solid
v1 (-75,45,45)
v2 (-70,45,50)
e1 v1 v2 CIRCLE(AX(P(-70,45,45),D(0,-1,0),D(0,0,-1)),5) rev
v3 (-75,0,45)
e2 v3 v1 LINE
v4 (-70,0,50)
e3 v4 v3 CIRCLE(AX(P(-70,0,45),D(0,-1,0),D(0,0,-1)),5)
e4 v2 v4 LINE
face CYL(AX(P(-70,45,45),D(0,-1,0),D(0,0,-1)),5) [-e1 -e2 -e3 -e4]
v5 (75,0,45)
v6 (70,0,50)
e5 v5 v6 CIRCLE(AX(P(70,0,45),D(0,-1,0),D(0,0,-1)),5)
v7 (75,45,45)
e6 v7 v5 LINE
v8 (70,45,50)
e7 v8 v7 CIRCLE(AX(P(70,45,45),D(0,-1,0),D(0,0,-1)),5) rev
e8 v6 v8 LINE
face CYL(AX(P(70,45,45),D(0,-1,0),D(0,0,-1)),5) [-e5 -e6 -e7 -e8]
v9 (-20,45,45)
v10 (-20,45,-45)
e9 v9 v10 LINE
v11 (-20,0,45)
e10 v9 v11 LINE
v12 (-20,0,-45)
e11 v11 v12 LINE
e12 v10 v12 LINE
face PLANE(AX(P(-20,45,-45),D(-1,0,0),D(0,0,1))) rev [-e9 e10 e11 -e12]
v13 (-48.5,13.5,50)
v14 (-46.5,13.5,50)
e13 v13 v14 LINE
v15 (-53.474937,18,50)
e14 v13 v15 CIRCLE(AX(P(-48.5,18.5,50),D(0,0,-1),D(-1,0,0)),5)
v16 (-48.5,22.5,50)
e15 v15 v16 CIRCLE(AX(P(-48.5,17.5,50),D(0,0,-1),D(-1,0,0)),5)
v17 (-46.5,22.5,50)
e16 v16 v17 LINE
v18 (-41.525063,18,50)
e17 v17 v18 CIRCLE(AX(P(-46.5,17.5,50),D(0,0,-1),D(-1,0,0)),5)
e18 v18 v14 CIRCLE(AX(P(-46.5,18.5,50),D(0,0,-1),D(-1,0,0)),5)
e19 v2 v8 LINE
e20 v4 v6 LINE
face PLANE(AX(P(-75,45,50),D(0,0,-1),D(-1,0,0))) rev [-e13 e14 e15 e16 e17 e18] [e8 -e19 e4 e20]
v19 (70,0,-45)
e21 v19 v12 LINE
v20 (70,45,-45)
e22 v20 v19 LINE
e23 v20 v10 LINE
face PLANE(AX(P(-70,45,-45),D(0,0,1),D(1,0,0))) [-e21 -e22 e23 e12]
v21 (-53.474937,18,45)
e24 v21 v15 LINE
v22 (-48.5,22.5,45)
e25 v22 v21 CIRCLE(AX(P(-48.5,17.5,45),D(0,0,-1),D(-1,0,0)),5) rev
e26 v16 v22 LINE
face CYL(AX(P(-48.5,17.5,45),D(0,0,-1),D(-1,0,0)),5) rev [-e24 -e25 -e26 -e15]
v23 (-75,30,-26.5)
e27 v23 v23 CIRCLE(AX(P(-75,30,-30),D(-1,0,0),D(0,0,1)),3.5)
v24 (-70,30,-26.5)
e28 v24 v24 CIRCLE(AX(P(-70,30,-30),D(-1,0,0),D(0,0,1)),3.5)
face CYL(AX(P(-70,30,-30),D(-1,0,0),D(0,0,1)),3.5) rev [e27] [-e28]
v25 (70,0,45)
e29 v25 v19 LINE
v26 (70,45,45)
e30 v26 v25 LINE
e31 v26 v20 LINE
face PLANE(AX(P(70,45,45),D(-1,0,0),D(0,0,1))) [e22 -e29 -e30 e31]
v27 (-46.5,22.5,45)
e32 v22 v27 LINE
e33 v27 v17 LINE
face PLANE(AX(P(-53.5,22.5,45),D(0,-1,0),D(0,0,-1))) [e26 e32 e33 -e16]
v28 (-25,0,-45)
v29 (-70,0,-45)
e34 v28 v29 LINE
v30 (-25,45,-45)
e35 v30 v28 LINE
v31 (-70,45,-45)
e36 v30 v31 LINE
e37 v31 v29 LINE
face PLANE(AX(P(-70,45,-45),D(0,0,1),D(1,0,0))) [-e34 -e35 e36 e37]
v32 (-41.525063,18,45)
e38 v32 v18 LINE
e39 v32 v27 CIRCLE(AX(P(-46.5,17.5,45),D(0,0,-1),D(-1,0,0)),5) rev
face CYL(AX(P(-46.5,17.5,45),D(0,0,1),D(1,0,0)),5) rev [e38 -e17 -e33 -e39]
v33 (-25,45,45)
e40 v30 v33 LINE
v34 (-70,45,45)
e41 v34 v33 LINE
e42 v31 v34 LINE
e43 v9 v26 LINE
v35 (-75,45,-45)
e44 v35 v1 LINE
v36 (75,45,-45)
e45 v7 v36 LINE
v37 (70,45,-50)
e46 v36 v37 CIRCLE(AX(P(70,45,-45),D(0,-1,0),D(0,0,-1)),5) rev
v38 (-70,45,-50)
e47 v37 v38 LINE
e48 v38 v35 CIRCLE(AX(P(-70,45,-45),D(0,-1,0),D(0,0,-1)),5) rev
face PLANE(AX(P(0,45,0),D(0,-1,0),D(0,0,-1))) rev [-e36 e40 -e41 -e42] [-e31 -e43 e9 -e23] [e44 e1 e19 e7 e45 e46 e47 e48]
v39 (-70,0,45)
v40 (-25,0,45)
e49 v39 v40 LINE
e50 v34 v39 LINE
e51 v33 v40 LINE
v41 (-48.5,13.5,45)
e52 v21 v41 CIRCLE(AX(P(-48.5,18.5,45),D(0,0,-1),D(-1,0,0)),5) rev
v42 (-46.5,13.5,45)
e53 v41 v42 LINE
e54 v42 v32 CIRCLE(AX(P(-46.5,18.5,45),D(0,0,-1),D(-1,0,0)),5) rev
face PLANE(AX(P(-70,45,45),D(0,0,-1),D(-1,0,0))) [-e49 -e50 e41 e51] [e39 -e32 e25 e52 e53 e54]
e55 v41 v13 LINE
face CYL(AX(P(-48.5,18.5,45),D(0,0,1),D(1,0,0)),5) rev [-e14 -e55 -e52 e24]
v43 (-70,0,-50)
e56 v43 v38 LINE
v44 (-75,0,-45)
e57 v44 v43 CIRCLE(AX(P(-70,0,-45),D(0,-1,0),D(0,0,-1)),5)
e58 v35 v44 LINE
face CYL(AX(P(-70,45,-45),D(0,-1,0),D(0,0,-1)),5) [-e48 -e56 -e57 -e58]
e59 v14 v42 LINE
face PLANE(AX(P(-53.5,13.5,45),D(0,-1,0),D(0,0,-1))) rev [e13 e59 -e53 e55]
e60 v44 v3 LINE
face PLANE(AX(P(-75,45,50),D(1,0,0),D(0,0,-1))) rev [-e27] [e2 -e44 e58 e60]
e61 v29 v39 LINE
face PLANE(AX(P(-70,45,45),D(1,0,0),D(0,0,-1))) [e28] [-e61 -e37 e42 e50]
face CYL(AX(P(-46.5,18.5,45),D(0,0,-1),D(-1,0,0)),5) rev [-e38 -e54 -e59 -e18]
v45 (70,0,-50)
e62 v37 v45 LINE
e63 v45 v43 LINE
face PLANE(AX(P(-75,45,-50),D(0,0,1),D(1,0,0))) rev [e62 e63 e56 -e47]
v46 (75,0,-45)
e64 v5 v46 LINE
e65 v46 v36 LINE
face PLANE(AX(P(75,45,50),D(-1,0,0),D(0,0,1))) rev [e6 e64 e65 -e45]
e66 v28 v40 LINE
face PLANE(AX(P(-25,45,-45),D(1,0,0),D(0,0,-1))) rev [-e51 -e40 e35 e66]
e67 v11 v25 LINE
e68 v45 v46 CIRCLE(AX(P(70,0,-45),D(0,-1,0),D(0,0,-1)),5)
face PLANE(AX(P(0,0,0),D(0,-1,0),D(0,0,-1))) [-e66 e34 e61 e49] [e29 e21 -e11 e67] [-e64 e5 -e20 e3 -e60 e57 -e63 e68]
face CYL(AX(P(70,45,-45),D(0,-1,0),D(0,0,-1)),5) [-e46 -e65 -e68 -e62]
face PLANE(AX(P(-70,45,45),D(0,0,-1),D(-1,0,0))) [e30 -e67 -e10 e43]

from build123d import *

# Parameters (mm, degrees)
SKETCH2_W           = 150
SKETCH2_H           = 100
SKETCH2_W_2         = 140
SKETCH2_H_2         = 90
BOSS_EXTRUDE3_DEPTH = 45
FILLET1_R           = 5
SKETCH3_W           = 5
SKETCH3_H           = 90
BOSS_EXTRUDE4_DEPTH = 45
SKETCH5_W           = 12
SKETCH5_H           = 9
CUT_EXTRUDE1_DEPTH  = 5
FILLET2_R           = 5
SKETCH6_R           = 3.5
CUT_EXTRUDE2_DEPTH  = 5


with BuildPart() as part:
    # Sketch2 → Boss-Extrude3 (new body)
    with BuildSketch(Plane(origin=(0, 0, 0), x_dir=(1, 0, 0), z_dir=(0, 1, 0))):
        Rectangle(SKETCH2_W, SKETCH2_H)
        Rectangle(SKETCH2_W_2, SKETCH2_H_2, mode=Mode.SUBTRACT)
    extrude(amount=BOSS_EXTRUDE3_DEPTH)

    # Fillet1
    fillet1_edges = [part.edges().sort_by_distance(p)[0] for p in [
        (75, 22.5, 50),
        (-75, 22.5, 50),
        (-75, 22.5, -50),
        (75, 22.5, -50),
    ]]
    fillet(fillet1_edges, radius=FILLET1_R)

    # Sketch3 → Boss-Extrude4 (add)
    with BuildSketch(Plane(origin=(0, 0, 0), x_dir=(1, 0, 0), z_dir=(0, 1, 0))):
        with Locations((-22.5, 0)):
            Rectangle(SKETCH3_W, SKETCH3_H)
    extrude(amount=BOSS_EXTRUDE4_DEPTH)

    # Sketch5 → Cut-Extrude1 (cut)
    with BuildSketch(Plane.XY.offset(50)):
        with Locations((-47.5, 18)):
            Rectangle(SKETCH5_W, SKETCH5_H)
    extrude(amount=-CUT_EXTRUDE1_DEPTH, mode=Mode.SUBTRACT)

    # Fillet2
    # the kernel refuses this fillet: 5 mm, written as the material it adds along each edge
    with BuildSketch(Plane(origin=(-53.5, 13.5, 50), x_dir=(0, 1, 0), z_dir=(0, 0, -1))) as fillet2_piece_1:
        with BuildLine():
            CenterArc((FILLET2_R, FILLET2_R), FILLET2_R, 180, 90)
            Line((0, FILLET2_R), (0, 0))
            Line((0, 0), (FILLET2_R, 0))
        make_face()
    extrude(amount=5)
    with BuildSketch(Plane(origin=(-53.5, 22.5, 50), x_dir=(0, -1, 0), z_dir=(0, 0, -1)), Plane(origin=(-41.5, 22.5, 50), x_dir=(-1, 0, 0), z_dir=(0, 0, -1)), Plane(origin=(-41.5, 13.5, 50), x_dir=(0, 1, 0), z_dir=(0, 0, -1))) as fillet2_piece_2:
        with BuildLine():
            CenterArc((FILLET2_R, -FILLET2_R), FILLET2_R, 90, 90)
            Line((0, -FILLET2_R), (0, 0))
            Line((0, 0), (FILLET2_R, 0))
        make_face()
    extrude(amount=5)

    # Sketch6 → Cut-Extrude2 (cut)
    with BuildSketch(Plane.ZY.offset(75)):
        with Locations((-30, 30)):
            Circle(SKETCH6_R)
    extrude(amount=-CUT_EXTRUDE2_DEPTH, mode=Mode.SUBTRACT)


solid = part.part
